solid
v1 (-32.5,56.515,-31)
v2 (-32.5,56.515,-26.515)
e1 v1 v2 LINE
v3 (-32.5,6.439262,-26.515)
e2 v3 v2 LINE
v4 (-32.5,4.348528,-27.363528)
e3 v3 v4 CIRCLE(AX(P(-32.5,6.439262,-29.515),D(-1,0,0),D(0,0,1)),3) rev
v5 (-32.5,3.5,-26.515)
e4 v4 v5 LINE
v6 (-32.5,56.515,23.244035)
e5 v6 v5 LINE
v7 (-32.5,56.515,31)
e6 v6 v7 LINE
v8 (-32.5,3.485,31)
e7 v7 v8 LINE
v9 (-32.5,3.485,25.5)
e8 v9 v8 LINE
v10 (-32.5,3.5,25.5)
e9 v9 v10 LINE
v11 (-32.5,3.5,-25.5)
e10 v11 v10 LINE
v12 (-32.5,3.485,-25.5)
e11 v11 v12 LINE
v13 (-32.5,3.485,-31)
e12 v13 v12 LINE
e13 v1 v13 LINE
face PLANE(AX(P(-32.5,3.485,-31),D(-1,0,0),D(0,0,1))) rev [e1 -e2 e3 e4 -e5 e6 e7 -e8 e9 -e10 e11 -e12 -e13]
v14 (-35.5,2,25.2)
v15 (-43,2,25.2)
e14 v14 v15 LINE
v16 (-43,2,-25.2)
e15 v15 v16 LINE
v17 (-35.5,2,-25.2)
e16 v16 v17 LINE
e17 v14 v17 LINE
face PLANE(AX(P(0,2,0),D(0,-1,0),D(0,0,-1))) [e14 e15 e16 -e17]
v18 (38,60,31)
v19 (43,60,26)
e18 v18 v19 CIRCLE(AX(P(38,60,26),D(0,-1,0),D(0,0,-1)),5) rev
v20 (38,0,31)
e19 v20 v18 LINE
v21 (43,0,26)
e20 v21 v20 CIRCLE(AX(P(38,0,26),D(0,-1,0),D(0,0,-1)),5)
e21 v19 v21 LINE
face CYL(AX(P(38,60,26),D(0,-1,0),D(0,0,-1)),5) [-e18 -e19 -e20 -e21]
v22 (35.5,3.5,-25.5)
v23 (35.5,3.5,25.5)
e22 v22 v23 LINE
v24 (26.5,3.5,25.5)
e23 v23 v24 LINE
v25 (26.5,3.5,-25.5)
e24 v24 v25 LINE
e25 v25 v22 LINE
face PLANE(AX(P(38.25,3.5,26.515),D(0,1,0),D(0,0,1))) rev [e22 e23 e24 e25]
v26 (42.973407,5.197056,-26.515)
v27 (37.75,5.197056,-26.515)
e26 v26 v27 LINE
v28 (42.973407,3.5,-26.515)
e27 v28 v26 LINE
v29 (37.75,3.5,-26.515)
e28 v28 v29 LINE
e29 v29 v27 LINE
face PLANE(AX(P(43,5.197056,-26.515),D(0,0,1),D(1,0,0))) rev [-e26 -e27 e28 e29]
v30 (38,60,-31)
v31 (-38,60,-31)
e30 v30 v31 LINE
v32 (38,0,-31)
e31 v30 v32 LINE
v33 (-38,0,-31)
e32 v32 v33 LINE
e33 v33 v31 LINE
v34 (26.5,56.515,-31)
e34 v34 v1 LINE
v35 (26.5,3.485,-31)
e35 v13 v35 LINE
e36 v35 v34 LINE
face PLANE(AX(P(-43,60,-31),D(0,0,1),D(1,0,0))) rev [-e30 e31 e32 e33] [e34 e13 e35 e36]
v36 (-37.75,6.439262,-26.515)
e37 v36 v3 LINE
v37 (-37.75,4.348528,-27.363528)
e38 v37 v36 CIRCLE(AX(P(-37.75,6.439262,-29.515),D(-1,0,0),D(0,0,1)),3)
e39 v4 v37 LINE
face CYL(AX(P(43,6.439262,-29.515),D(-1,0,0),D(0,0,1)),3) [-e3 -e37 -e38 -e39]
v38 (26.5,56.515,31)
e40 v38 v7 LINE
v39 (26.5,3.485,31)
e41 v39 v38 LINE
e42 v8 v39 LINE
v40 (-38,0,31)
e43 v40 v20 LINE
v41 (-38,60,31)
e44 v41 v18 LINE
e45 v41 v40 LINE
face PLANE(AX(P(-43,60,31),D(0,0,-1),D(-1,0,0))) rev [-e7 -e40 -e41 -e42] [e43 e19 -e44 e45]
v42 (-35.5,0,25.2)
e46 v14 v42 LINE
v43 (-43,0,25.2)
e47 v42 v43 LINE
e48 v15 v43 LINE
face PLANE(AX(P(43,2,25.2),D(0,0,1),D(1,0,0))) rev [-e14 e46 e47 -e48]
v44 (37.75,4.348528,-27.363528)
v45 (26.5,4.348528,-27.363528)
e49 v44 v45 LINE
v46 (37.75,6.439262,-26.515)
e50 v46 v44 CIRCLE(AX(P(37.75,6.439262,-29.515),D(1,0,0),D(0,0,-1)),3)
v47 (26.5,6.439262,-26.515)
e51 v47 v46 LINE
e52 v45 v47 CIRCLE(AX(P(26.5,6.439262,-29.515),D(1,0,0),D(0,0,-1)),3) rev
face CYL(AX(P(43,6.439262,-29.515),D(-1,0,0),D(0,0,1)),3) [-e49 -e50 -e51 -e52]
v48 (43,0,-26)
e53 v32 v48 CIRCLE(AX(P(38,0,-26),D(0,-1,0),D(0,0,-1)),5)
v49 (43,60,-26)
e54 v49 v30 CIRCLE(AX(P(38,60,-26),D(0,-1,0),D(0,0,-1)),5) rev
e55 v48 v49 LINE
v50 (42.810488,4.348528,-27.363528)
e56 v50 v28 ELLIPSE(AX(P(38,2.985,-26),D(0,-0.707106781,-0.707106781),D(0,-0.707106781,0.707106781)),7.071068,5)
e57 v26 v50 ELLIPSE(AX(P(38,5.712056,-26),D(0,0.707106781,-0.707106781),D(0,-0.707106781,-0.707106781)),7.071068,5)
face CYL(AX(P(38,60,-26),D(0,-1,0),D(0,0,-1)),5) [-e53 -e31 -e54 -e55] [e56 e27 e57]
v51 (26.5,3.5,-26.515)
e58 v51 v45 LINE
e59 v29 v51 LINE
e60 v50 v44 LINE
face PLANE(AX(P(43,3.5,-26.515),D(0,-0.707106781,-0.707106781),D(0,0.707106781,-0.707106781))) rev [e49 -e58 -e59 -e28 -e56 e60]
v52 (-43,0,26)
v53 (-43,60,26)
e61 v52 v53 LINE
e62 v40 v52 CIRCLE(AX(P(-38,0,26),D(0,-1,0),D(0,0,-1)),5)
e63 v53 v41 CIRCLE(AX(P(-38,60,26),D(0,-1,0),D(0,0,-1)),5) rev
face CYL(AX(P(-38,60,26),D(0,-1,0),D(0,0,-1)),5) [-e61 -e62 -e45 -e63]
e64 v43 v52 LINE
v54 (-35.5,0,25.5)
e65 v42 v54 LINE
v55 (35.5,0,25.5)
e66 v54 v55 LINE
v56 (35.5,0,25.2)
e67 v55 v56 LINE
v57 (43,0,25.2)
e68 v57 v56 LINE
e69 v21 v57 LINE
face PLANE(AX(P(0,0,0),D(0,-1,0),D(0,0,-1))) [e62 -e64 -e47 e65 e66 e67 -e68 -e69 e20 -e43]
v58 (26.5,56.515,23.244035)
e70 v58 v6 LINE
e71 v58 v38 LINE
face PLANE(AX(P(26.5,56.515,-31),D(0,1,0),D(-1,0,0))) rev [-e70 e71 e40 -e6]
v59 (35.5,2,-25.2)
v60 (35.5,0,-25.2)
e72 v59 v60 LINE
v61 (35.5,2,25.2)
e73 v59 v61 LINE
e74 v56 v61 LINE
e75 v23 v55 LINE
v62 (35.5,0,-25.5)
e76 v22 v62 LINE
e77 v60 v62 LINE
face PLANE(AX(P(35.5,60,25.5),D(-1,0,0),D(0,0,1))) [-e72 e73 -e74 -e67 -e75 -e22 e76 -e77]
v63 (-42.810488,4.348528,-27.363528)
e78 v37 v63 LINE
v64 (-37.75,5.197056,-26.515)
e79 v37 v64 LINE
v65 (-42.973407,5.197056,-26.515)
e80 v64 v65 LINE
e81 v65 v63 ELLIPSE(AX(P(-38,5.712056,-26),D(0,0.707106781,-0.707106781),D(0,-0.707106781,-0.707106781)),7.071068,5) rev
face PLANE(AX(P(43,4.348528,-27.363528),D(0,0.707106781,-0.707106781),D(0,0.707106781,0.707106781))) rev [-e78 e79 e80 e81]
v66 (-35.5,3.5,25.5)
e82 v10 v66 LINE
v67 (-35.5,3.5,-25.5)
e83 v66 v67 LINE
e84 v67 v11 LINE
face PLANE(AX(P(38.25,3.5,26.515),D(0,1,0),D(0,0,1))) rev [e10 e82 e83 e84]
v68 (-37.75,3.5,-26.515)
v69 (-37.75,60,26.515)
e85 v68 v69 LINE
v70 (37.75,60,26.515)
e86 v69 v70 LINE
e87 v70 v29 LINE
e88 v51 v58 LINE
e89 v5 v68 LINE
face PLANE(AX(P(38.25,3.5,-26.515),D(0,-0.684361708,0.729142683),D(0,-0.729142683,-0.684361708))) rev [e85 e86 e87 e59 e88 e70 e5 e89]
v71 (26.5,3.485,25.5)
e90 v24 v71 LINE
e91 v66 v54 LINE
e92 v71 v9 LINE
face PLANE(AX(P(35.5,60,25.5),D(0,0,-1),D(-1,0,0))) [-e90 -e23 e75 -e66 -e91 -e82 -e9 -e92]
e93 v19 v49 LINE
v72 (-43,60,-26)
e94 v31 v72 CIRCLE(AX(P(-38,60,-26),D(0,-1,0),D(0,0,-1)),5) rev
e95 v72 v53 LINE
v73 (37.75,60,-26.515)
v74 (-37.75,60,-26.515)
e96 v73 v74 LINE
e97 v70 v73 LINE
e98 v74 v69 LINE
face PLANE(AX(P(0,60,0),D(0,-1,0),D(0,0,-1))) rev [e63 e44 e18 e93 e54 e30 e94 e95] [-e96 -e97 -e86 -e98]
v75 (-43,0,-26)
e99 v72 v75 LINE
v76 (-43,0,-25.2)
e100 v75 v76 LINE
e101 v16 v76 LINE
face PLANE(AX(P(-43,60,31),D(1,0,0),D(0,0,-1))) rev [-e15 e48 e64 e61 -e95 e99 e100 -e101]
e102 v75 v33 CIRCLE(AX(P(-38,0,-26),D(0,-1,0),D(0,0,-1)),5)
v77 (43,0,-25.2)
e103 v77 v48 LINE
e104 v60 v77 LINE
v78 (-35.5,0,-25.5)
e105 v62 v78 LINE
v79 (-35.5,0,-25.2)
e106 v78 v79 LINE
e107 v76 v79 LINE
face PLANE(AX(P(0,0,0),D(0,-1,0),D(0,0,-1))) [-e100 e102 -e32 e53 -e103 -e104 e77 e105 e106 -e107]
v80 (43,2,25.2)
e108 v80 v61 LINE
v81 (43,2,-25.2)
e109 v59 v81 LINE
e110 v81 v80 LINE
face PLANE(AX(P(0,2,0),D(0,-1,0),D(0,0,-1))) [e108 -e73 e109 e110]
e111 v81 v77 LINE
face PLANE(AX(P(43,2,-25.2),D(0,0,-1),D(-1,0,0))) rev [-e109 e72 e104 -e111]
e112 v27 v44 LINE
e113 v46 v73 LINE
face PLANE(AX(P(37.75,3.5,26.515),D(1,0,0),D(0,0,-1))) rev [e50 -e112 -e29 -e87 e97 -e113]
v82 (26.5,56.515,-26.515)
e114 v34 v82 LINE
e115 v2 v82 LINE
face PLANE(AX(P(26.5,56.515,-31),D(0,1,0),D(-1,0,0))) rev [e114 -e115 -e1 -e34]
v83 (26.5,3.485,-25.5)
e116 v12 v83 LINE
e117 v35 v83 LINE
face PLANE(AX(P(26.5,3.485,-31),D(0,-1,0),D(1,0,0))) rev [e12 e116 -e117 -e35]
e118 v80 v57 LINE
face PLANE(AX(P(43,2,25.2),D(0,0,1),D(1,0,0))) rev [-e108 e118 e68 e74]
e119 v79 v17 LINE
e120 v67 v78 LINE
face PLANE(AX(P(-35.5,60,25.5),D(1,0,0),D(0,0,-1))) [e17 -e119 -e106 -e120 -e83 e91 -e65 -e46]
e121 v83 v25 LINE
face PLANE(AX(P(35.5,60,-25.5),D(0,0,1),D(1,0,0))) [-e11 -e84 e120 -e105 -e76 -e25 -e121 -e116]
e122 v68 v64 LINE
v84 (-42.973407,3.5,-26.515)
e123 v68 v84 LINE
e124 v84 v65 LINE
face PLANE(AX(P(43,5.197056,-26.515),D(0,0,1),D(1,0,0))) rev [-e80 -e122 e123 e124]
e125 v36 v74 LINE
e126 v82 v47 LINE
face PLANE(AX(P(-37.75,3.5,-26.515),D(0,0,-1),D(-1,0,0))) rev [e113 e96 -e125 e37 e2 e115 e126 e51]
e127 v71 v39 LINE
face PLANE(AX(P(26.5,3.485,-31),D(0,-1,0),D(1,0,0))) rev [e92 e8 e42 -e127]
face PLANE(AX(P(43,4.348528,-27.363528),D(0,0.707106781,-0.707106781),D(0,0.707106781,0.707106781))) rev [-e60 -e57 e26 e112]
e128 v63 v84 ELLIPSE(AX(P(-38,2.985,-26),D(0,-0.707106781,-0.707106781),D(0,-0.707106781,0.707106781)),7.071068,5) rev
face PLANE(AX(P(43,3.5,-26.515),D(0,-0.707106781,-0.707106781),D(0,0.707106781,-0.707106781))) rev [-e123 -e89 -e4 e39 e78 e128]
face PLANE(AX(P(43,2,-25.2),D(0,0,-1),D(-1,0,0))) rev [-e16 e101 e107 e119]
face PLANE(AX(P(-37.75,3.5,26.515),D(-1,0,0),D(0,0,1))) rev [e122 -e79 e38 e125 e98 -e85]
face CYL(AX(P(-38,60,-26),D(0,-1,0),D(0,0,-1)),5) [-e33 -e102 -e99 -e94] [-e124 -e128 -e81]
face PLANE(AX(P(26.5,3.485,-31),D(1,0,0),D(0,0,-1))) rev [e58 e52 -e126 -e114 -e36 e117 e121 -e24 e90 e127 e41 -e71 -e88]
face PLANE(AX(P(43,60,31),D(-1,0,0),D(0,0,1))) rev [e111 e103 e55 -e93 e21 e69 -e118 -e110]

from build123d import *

# Parameters (mm, degrees)
SKETCH_1_W               = 86
SKETCH_1_H               = 62
SKETCH_1_W_2             = 71
SKETCH_1_H_2             = 51
EXTRUDE_1_DEPTH          = 60
SKETCH_2_W               = 75.5
SKETCH_2_H               = 53.03
CUT_EXTRUDE_1_DEPTH      = 56.5
EXTRUDE_2_DEPTH          = 76
SKETCH_4_W               = 59
SKETCH_4_H               = 53.03
CUT_EXTRUDE_2_DEPTH      = 97.400207469
CUT_EXTRUDE_3_DEPTH      = 97.908461963
CUT_EXTRUDE_3_DEPTH_BACK = 97.908461963
SKETCH_7_W               = 86
SKETCH_7_H               = 50.4
CUT_EXTRUDE_4_DEPTH      = 2
FILLET_1_R               = 5
FILLET_2_R               = 3


with BuildPart() as part:
    # 草图1 → 凸台-拉伸1 (new body)
    with BuildSketch(Plane(origin=(0, 0, 0), x_dir=(1, 0, 0), z_dir=(0, 1, 0))):
        Rectangle(SKETCH_1_W, SKETCH_1_H)
        Rectangle(SKETCH_1_W_2, SKETCH_1_H_2, mode=Mode.SUBTRACT)
    extrude(amount=EXTRUDE_1_DEPTH)

    # 草图2 → 切除-拉伸1 (cut)
    with BuildSketch(Plane(origin=(0, 60, 0), x_dir=(1, 0, 0), z_dir=(0, 1, 0))):
        Rectangle(SKETCH_2_W, SKETCH_2_H)
    extrude(amount=-CUT_EXTRUDE_1_DEPTH, mode=Mode.SUBTRACT)

    # 草图3 → 凸台-拉伸2 (add)
    with BuildSketch(Plane(origin=(-37.75, 0, 0), x_dir=(0, 0, -1), z_dir=(1, 0, 0))):
        Polygon((26.515, 3.5), (-26.515, 60), (-26.515, 3.5), align=None)
    extrude(amount=EXTRUDE_2_DEPTH)

    # 草图4 → 切除-拉伸2 (cut, through all)
    with BuildSketch(Plane.XY.offset(31)):
        with Locations((-3, 30)):
            Rectangle(SKETCH_4_W, SKETCH_4_H)
    extrude(amount=-CUT_EXTRUDE_2_DEPTH, mode=Mode.SUBTRACT)

    # 草图5 → 切除-拉伸3 (cut, two sides: drawn at the far end of the back side and taken through both)
    with BuildSketch(Plane.ZY.offset(-26.5).offset(-CUT_EXTRUDE_3_DEPTH_BACK)):
        Polygon((-26.515, 3.5), (-27.363528137, 4.348528137), (-26.515, 5.197056275), align=None)
    extrude(amount=CUT_EXTRUDE_3_DEPTH + CUT_EXTRUDE_3_DEPTH_BACK, mode=Mode.SUBTRACT)

    # 草图7 → 切除-拉伸4 (cut)
    with BuildSketch(Plane.XZ):
        Rectangle(SKETCH_7_W, SKETCH_7_H)
    extrude(amount=-CUT_EXTRUDE_4_DEPTH, mode=Mode.SUBTRACT)

    # 圆角1
    # the kernel refuses this fillet: 5 mm, written as the material it takes off along each edge
    with BuildSketch(Plane(origin=(43, -12.5, 31), x_dir=(-1, 0, 0), z_dir=(0, 1, 0)), Plane(origin=(43, -12.5, -31), x_dir=(0, 0, 1), z_dir=(0, 1, 0))) as fillet_1_piece_1:
        with BuildLine():
            CenterArc((FILLET_1_R, -FILLET_1_R), FILLET_1_R, 90, 90)
            Line((0, -FILLET_1_R), (0, 0))
            Line((0, 0), (FILLET_1_R, 0))
        make_face()
    extrude(amount=85, mode=Mode.SUBTRACT)
    with BuildSketch(Plane(origin=(-43, -12.5, 31), x_dir=(1, 0, 0), z_dir=(0, 1, 0)), Plane(origin=(-43, -12.5, -31), x_dir=(0, 0, 1), z_dir=(0, 1, 0))) as fillet_1_piece_2:
        with BuildLine():
            CenterArc((FILLET_1_R, FILLET_1_R), FILLET_1_R, 180, 90)
            Line((0, FILLET_1_R), (0, 0))
            Line((0, 0), (FILLET_1_R, 0))
        make_face()
    extrude(amount=85, mode=Mode.SUBTRACT)

    # 圆角2
    # the kernel refuses this fillet: 3 mm, written as the material it takes off along each edge
    with BuildSketch(Plane(origin=(37.75, 5.197056275, -26.515), x_dir=(0, 1, 0), z_dir=(-1, 0, 0))) as fillet_2_piece_1_section:
        with BuildLine():
            CenterArc((FILLET_2_R * 0.414213562373, FILLET_2_R), FILLET_2_R, 225, 45)
            Line((-FILLET_2_R * 0.292893218813, FILLET_2_R * 0.292893218813), (0, 0))
            Line((0, 0), (FILLET_2_R * 0.414213562373, 0))
        make_face()
    fillet_2_piece_1 = extrude(amount=14.356601718, mode=Mode.PRIVATE)
    fillet_2_piece_1 = split(fillet_2_piece_1, bisect_by=Plane(origin=(32.125, 4.476160676, -27.491160676), z_dir=(0, 0.7071067811865434, 0.7071067811865518)), keep=Keep.TOP, mode=Mode.PRIVATE)
    add(fillet_2_piece_1, mode=Mode.SUBTRACT)
    with BuildSketch(Plane(origin=(-29.393398282, 5.197056275, -26.515), x_dir=(0, 1, 0), z_dir=(-1, 0, 0))) as fillet_2_piece_2_section:
        with BuildLine():
            CenterArc((FILLET_2_R * 0.414213562373, FILLET_2_R), FILLET_2_R, 225, 45)
            Line((-FILLET_2_R * 0.292893218813, FILLET_2_R * 0.292893218813), (0, 0))
            Line((0, 0), (FILLET_2_R * 0.414213562373, 0))
        make_face()
    fillet_2_piece_2 = extrude(amount=8.356601718, mode=Mode.PRIVATE)
    fillet_2_piece_2 = split(fillet_2_piece_2, bisect_by=Plane(origin=(-35.125, 4.476160676, -27.491160676), z_dir=(0, 0.7071067811865434, 0.7071067811865518)), keep=Keep.TOP, mode=Mode.PRIVATE)
    add(fillet_2_piece_2, mode=Mode.SUBTRACT)


solid = part.part
